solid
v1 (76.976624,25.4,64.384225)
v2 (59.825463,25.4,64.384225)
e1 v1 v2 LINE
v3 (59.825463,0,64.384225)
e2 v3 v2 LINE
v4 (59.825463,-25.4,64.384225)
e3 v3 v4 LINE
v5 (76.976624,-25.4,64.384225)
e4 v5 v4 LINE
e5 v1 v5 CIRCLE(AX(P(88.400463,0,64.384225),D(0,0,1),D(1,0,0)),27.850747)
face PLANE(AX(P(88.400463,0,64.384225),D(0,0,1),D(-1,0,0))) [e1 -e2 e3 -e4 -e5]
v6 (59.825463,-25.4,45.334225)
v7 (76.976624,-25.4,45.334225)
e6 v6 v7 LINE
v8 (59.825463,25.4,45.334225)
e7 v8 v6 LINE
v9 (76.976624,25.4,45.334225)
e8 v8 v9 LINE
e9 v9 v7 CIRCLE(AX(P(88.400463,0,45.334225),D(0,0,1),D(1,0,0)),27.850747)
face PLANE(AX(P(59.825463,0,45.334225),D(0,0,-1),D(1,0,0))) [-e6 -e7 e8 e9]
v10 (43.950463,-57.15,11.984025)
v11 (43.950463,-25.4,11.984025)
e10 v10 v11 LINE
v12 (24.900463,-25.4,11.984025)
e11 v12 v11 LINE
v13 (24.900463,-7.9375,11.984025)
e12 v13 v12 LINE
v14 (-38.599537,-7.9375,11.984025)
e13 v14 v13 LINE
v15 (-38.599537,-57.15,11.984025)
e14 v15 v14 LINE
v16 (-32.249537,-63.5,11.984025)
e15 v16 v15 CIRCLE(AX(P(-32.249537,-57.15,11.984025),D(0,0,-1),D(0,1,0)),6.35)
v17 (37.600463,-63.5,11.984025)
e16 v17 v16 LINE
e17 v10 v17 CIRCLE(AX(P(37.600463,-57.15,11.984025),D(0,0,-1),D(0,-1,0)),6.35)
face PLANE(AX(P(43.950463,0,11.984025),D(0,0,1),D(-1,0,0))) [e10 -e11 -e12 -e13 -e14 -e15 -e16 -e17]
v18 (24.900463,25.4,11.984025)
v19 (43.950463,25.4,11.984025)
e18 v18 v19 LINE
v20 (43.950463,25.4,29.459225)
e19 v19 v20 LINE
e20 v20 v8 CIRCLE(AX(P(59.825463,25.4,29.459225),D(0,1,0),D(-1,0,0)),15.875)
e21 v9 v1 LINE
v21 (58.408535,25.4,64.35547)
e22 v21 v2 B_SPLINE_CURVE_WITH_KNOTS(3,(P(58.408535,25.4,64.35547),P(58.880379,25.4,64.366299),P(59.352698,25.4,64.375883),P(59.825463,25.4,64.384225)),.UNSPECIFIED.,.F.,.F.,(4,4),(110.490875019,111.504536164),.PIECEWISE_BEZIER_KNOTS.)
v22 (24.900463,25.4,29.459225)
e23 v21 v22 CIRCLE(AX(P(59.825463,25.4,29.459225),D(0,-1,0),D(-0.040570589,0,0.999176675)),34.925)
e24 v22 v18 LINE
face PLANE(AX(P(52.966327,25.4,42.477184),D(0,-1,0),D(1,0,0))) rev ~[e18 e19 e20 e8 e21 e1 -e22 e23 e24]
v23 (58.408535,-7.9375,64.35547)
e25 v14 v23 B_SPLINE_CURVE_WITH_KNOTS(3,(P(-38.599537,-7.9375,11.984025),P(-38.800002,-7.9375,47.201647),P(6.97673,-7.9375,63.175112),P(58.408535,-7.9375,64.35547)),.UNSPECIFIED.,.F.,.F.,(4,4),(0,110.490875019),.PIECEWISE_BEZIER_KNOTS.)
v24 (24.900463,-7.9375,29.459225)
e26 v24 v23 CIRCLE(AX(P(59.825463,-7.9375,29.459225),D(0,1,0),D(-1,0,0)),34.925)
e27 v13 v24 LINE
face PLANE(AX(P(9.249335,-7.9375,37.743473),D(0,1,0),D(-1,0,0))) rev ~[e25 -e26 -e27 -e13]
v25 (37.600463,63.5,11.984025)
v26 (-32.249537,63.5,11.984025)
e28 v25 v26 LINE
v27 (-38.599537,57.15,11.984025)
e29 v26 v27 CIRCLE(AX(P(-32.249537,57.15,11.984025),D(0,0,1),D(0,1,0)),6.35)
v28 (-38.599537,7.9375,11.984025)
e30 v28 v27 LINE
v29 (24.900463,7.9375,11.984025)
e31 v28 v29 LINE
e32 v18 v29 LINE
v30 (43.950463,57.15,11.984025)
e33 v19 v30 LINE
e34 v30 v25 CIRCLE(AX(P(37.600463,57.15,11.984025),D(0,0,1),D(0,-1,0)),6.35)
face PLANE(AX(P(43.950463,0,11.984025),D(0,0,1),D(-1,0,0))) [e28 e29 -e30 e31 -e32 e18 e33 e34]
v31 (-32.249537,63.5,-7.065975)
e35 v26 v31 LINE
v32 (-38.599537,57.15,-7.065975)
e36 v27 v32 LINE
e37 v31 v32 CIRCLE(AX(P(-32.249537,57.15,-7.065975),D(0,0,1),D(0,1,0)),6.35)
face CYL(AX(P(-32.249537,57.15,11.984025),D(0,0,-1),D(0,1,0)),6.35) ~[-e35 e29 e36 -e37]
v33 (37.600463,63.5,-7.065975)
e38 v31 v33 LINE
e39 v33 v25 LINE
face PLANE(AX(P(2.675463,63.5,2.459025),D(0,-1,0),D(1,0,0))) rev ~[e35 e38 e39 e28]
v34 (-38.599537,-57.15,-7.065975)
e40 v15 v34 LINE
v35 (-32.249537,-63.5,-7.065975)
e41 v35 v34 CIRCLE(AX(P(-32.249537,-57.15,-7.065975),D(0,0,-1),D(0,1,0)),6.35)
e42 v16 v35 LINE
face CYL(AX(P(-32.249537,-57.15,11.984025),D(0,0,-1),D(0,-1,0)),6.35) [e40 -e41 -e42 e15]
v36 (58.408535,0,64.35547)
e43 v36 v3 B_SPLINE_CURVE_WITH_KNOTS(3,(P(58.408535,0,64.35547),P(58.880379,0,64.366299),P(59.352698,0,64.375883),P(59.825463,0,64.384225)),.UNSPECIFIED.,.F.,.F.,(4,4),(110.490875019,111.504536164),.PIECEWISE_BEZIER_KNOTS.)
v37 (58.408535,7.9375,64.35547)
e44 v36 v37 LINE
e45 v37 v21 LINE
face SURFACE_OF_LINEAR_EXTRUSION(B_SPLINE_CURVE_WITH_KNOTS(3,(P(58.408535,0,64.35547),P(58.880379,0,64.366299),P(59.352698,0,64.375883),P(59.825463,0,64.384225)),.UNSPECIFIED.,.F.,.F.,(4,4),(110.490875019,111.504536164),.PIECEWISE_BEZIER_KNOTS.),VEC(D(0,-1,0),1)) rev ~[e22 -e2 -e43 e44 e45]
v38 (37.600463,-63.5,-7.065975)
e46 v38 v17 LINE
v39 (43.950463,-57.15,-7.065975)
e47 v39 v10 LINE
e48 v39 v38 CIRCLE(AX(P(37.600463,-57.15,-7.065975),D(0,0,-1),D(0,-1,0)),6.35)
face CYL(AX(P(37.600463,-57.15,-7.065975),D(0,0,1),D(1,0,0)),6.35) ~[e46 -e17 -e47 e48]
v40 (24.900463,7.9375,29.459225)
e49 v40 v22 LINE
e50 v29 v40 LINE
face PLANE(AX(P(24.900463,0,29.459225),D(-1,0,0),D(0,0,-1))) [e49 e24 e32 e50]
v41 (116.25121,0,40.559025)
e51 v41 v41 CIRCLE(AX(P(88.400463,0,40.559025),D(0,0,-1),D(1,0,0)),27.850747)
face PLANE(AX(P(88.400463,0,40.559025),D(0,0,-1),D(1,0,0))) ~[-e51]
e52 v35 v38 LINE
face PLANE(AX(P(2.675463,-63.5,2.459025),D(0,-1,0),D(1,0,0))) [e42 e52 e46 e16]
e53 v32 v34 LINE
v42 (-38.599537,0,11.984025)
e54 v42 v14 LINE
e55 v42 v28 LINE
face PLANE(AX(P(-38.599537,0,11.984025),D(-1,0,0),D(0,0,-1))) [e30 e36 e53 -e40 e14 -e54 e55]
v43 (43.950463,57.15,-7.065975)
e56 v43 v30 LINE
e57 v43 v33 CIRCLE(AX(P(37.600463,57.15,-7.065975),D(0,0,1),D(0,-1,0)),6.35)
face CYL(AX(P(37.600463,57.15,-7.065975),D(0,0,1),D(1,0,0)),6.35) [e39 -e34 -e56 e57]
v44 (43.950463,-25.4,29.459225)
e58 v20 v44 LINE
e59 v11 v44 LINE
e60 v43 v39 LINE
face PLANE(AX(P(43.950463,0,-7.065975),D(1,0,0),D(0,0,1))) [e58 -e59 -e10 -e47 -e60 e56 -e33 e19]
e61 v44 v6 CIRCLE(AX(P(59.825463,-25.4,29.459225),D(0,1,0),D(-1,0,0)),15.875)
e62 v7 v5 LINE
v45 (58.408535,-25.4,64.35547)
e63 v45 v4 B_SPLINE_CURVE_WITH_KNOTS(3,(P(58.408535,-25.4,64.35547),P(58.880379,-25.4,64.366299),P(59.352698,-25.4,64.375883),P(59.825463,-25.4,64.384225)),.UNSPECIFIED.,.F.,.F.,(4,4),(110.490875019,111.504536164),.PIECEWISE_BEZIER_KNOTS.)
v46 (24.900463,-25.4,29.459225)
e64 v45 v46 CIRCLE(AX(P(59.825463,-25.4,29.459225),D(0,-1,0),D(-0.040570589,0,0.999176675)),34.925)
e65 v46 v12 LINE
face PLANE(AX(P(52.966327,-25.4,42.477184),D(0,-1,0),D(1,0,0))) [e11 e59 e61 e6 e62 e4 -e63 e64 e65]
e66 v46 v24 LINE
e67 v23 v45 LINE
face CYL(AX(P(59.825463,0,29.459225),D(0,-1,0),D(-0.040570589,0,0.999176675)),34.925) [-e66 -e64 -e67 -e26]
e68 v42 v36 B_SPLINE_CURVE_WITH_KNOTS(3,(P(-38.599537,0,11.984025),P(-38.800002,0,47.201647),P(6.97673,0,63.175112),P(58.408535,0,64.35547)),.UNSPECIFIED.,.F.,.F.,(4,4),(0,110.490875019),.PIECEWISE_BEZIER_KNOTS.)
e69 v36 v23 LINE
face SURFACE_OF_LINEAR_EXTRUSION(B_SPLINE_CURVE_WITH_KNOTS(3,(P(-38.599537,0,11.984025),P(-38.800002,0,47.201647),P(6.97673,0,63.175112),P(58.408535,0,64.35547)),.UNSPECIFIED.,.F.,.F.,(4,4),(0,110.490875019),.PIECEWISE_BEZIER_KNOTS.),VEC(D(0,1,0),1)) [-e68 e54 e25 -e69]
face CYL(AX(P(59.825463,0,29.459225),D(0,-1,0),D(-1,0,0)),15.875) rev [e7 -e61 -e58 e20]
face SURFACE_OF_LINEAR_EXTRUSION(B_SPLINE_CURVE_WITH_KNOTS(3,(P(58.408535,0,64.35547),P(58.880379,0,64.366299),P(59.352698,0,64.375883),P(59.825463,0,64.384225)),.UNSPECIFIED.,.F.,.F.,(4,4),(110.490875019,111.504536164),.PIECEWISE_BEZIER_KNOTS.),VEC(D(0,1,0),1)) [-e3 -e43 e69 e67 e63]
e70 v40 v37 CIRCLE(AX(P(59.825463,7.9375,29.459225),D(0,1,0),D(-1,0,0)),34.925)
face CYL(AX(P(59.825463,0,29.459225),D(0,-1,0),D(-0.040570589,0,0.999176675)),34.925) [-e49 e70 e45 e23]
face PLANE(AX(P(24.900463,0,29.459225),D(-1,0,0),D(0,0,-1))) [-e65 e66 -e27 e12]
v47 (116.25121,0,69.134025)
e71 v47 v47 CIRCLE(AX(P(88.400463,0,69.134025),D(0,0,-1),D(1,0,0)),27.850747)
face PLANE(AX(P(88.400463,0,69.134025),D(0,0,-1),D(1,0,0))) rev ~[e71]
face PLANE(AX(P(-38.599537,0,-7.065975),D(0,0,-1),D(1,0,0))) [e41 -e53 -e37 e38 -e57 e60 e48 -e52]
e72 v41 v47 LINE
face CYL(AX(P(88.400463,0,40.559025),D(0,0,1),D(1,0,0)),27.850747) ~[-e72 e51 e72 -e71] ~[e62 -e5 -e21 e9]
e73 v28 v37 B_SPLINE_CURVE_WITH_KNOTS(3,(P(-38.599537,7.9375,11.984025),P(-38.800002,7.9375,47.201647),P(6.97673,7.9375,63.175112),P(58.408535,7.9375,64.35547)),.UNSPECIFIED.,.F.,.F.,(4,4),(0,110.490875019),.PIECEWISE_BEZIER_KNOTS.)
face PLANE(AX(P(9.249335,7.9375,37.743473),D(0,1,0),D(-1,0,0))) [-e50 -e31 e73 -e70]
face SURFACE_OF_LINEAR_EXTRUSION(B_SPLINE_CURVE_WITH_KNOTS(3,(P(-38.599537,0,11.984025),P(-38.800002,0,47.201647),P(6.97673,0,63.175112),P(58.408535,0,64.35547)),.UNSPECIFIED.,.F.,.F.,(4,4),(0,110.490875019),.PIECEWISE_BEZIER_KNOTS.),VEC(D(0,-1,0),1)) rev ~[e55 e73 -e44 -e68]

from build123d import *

# Parameters (mm, degrees)
F1_DEPTH = 63.5
F2_DEPTH = 25.4
F3_DEPTH = 7.9375
F5_R     = 6.35


# Not quite as in the source:
# - a feature names something its author has since deleted; it is built from what else it names


with BuildPart() as f1:
    # F0 (on Front) → F1 (new body, symmetric)
    with BuildSketch(Plane.XZ):
        Polygon((24.9004629219, 11.984025088), (-38.5995370781, 11.984025088), (-38.5995370781, -7.065974912), (43.9504629219, -7.065974912), (43.9504629219, 11.984025088), align=None)
    extrude(amount=F1_DEPTH, both=True)

    # F0 (on Front) → F2 (join, symmetric)
    with BuildSketch(Plane.XZ):
        with BuildLine():
            Line((24.9004629219, 29.459225088), (24.9004629219, 11.984025088))
            Line((24.9004629219, 11.984025088), (43.9504629219, 11.984025088))
            Line((43.9504629219, 11.984025088), (43.9504629219, 29.459225088))
            ThreePointArc((43.9504629219, 29.459225088), (48.6001427706, 40.6845452393), (59.8254629219, 45.334225088))
            Line((59.8254629219, 45.334225088), (65.5219778419, 45.334225088))
            Line((65.5219778419, 45.334225088), (88.4004629219, 45.334225088))
            Line((88.4004629219, 45.334225088), (88.4004629219, 64.384225088))
            Line((88.4004629219, 64.384225088), (65.4512095848, 64.384225088))
            Line((65.4512095848, 64.384225088), (59.8254629219, 64.384225088))
            add(Edge.make_bspline(
                [(58.4085351023, 64.3554704527), (58.8803787931, 64.3662992509), (59.3526984445, 64.3758829837), (59.8254629219, 64.384225088)],
                knots=[110.4908750185, 110.4908750185, 110.4908750185, 110.4908750185, 111.5045361635, 111.5045361635, 111.5045361635, 111.5045361635], degree=3))
            ThreePointArc((58.4085351023, 64.3554704527), (34.6337794817, 53.6487829684), (24.9004629219, 29.459225088))
        make_face()
    extrude(amount=F2_DEPTH, both=True)

    # F0 (on Front) → F3 (join, symmetric)
    with BuildSketch(Plane.XZ):
        with BuildLine():
            add(Edge.make_bspline(
                [(-38.5995370781, 11.984025088), (-38.8000023371, 47.2016469024), (6.976730171, 63.1751121082), (58.4085351023, 64.3554704527)],
                knots=[0, 0, 0, 0, 110.4908750185, 110.4908750185, 110.4908750185, 110.4908750185], degree=3))
            Line((-38.5995370781, 11.984025088), (24.9004629219, 11.984025088))
            Line((24.9004629219, 11.984025088), (24.9004629219, 29.459225088))
            ThreePointArc((24.9004629219, 29.459225088), (34.6337794817, 53.6487829684), (58.4085351023, 64.3554704527))
        make_face()
    extrude(amount=F3_DEPTH, both=True)

    # F0 (on Front) → F4 (revolve)
    with BuildSketch(Plane.XZ):
        Polygon((88.4004629219, 69.134025088), (88.4004629219, 64.384225088), (88.4004629219, 45.334225088), (88.4004629219, 40.559025088), (116.2512095848, 40.559025088), (116.2512095848, 69.134025088), align=None)
    revolve(axis=Axis((88.4004629219, 0, 54.846525088), (0, 0, -1)))

    # F5
    f5_edges = [f1.edges().sort_by_distance(p)[0] for p in [
        (-38.599537, -63.5, 2.459025),
        (43.950463, -63.5, 2.459025),
        (-38.599537, 63.5, 2.459025),
        (43.950463, 63.5, 2.459025),
    ]]
    fillet(f5_edges, radius=F5_R)


solid = f1.part
